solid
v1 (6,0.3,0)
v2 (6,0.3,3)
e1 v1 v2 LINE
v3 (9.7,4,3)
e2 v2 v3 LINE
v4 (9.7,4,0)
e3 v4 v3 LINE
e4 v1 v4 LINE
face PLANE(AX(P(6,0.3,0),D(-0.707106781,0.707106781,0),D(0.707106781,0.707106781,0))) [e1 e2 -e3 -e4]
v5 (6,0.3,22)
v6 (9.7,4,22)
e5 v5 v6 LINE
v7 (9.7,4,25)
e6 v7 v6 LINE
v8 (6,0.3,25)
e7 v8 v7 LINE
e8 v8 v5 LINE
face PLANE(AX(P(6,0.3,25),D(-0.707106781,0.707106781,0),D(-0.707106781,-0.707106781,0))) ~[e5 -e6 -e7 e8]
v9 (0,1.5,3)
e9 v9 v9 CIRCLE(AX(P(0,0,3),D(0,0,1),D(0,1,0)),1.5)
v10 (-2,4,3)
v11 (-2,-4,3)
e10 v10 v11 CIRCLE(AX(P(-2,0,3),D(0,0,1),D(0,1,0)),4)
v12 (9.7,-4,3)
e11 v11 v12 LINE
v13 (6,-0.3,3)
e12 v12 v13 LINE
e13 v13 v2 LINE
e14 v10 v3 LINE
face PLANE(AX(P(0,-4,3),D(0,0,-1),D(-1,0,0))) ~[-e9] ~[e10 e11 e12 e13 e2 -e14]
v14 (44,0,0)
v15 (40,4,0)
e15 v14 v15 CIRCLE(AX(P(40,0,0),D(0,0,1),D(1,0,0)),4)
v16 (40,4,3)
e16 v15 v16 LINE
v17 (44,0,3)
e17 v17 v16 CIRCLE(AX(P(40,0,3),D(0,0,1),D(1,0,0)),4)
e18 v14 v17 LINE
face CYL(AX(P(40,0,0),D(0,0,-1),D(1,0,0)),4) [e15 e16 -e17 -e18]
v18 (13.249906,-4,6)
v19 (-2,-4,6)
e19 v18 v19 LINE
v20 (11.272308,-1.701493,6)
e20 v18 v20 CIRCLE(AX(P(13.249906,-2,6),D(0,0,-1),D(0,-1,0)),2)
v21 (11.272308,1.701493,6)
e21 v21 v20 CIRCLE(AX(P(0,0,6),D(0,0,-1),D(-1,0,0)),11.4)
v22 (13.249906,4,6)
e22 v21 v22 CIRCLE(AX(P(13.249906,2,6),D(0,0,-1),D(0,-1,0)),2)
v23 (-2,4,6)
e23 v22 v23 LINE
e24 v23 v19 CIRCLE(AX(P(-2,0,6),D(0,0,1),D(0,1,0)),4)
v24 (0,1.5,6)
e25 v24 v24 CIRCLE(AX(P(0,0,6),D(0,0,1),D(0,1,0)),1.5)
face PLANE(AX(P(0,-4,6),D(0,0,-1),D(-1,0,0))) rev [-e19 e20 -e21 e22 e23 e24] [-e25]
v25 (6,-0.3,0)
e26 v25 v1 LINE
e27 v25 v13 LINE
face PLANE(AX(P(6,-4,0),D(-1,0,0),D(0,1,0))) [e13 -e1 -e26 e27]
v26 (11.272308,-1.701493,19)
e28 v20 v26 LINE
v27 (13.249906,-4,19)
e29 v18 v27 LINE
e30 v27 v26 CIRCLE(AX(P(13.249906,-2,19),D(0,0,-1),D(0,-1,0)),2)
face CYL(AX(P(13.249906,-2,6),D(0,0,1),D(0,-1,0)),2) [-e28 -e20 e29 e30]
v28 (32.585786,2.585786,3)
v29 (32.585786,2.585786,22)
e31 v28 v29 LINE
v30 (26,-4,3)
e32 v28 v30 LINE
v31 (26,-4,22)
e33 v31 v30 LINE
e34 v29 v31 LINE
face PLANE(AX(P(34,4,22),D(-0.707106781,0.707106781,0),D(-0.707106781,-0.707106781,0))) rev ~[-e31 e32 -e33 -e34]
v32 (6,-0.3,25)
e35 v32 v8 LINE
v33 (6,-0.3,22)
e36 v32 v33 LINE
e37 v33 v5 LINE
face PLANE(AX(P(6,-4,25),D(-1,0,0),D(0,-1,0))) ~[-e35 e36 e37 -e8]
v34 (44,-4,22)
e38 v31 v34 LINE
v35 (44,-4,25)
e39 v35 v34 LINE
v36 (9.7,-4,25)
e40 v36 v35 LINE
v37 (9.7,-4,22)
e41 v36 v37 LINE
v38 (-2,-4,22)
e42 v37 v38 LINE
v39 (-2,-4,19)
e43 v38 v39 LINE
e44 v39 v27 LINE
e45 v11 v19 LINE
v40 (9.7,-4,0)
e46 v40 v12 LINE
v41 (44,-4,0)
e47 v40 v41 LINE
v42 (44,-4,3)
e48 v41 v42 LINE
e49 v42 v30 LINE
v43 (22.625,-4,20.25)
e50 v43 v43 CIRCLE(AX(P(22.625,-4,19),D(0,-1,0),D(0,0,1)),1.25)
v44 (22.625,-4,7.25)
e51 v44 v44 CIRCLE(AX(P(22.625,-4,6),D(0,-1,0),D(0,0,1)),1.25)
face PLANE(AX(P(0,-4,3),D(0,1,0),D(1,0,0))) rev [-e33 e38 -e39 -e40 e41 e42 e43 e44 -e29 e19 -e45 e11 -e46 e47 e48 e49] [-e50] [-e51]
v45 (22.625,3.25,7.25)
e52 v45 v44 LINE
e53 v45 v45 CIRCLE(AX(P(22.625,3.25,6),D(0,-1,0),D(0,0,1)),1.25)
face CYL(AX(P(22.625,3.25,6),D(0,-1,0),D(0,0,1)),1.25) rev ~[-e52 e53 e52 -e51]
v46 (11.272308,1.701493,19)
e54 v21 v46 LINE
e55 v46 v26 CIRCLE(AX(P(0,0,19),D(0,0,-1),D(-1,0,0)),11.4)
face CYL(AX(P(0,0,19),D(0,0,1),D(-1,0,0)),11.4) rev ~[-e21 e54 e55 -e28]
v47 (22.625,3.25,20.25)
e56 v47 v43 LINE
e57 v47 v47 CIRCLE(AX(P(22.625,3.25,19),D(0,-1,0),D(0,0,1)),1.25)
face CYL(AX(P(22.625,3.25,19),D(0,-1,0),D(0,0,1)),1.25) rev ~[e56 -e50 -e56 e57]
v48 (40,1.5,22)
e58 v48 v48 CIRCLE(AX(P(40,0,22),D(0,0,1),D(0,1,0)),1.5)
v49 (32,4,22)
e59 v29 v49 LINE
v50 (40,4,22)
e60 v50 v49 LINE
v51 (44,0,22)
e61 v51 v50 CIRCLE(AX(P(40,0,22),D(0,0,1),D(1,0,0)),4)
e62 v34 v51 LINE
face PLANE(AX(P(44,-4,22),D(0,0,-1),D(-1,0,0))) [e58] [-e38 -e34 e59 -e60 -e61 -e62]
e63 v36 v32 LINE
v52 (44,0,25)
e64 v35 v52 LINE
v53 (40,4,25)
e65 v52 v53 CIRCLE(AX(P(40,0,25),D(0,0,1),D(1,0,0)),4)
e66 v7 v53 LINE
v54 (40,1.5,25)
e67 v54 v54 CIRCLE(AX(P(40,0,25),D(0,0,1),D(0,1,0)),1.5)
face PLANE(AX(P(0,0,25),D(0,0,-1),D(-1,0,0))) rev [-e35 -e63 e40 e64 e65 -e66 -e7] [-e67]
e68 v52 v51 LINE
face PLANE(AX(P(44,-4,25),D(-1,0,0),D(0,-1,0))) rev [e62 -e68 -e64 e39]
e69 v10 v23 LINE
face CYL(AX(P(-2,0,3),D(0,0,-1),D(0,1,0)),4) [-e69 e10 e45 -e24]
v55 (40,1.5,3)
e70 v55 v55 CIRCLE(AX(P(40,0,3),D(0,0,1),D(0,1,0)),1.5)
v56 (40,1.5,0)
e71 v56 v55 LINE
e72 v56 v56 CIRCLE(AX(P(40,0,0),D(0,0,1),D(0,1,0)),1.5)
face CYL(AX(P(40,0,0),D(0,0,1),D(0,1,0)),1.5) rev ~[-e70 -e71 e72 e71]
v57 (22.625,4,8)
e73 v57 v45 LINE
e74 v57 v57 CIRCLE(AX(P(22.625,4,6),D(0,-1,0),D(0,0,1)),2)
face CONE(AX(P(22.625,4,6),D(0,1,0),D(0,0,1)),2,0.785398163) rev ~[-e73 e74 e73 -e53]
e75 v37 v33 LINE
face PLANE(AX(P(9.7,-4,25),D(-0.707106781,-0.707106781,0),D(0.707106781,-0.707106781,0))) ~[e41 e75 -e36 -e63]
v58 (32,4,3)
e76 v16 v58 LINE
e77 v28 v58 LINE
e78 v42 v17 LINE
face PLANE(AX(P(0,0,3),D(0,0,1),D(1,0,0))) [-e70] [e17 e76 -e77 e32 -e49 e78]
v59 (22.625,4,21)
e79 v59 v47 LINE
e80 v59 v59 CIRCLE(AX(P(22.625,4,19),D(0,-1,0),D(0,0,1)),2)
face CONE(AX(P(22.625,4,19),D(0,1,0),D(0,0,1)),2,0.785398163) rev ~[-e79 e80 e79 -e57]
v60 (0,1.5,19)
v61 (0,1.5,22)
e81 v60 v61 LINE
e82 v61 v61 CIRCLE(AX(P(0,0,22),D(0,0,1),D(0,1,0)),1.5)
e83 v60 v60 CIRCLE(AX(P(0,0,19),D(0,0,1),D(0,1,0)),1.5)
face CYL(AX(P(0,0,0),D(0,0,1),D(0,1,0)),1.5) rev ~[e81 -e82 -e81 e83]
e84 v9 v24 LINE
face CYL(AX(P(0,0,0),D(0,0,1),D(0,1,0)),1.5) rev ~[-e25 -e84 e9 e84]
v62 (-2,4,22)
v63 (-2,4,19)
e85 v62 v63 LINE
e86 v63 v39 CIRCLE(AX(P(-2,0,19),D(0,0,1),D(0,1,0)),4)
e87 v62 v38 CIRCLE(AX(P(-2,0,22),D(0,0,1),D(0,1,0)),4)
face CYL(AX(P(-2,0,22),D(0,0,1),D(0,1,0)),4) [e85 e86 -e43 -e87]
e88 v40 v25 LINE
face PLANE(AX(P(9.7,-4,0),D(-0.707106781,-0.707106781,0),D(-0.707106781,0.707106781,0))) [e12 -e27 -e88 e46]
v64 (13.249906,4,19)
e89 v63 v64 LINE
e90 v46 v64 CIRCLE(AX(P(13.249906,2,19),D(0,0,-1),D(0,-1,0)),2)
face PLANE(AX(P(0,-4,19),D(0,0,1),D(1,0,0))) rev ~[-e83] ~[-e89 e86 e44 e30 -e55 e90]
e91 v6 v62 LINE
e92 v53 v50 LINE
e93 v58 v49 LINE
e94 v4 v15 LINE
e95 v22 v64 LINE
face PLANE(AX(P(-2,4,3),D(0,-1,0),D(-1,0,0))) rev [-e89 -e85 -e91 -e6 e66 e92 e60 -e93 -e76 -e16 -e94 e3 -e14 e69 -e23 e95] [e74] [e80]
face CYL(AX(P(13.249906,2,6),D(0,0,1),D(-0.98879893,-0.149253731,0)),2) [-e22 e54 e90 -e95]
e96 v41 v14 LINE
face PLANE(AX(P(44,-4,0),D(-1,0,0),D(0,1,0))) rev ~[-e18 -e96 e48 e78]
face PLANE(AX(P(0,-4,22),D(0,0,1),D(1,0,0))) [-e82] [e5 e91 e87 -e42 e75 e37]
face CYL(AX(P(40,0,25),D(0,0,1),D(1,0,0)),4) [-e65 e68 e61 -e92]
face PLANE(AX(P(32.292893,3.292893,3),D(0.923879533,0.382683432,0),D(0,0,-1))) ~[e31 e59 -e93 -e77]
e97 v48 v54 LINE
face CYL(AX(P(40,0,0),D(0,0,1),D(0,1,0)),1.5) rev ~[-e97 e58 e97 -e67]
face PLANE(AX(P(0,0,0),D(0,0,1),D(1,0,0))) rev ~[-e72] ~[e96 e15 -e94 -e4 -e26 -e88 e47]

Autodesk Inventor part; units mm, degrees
ref_plane "YZ Plane" through (0, 0, 0) normal (1, 0, 0) x (0, 1, 0)
ref_plane "XZ Plane" through (0, 0, 0) normal (0, 1, 0) x (-1, 0, 0)
ref_plane "XY Plane" through (0, 0, 0) normal (0, 0, 1) x (1, 0, 0)
sketch "Skizze1" plane through (0, 0, 0) normal (0, 0, 1) x (1, 0, 0)
  circle A0 centre (0, 0) radius 4 construction
  circle A1 centre (40, 0) radius 4 construction
  line L0 (0, 0) -> (40, 0) construction
  arc A2 (0, 4) -> (0, -4) centre (0, 0) ccw
  arc A3 (44, 0) -> (40, 4) centre (40, 0) ccw
  line L1 (0, 4) -> (40, 4)
  line L2 (0, -4) -> (44, -4)
  line L3 (44, -4) -> (44, 0)
  dimension "d0" = 8
  dimension "d1" = 40
extrude "Extrusion1" add sketch "Skizze1" along normal blind 3
sketch "Skizze2" plane through (0, 0, 3) normal (0, 0, 1) x (1, 0, 0)
  arc A0 (0, 4) -> (0, -4) centre (0, 0) ccw projected
  line L0 (0, -4) -> (44, -4) projected
  line L1 (44, -4) -> (44, 0) projected
  arc A1 (44, 0) -> (40, 4) centre (40, 0) ccw projected
  line L2 (40, 4) -> (0, 4) projected
  line L3 (6, 4) -> (34, 4)
  line L4 (34, 4) -> (34, -4)
  line L5 (34, -4) -> (6, -4)
  line L6 (6, -4) -> (6, 4)
  line L7 (0, 0) -> (-4, 0) construction
  line L8 (-4, 0) -> (-4, -4) construction
  line L9 (-4, -4) -> (0, -4) construction
  line L10 (0, -4) -> (0, 0) construction
  dimension "d4" = 10
  dimension "d5" = 4
  dimension "d6" = 10
extrude "Extrusion2" add sketch "Skizze2" along normal blind 9.5 contours L2 L4 L0 L6
sketch "Skizze3" plane through (0, 0, 0) normal (0, 0, -1) x (-1, 0, 0)
  line L0 (-6, -4) -> (-6, 4) projected
  line L1 (-6, 4) -> (0, 4) projected
  arc A0 (0, -4) -> (0, 4) centre (0, 0) ccw projected
  line L2 (0, -4) -> (-6, -4) projected
sketch "Skizze4" plane through (0, 0, 3) normal (0, 0, 1) x (1, 0, 0)
  line L0 (6, -4) -> (6, 4) projected
  line L1 (6, 4) -> (0, 4) projected
  arc A0 (0, 4) -> (0, -4) centre (0, 0) ccw projected
  line L2 (0, -4) -> (6, -4) projected
extrude "Extrusion3" add sketch "Skizze4" along normal blind 3
extrude "Extrusion4" cut sketch "Skizze3" against normal blind 3
sketch "Skizze5" plane through (0, 0, 0) normal (0, 0, -1) x (-1, 0, 0)
  line L0 (-6, -4) -> (-6, 4) projected
  line L1 (-40, 4) -> (-6, 4) projected
  arc A0 (-40, 4) -> (-44, 0) centre (-40, 0) ccw projected
  line L2 (-6, -4) -> (-44, -4) projected
  line L3 (-6, 0.3) -> (-9.7, 4)
  line L4 (-9.7, -4) -> (-6, -0.3)
  line L5 (-9.7, 4) -> (-6, 4)
  line L6 (-6, 0.3) -> (-6, 4)
  line L7 (0, 0) -> (-40, 0) construction
  circle A1 centre (0, 0) radius 4
  line L8 (-6, -4) -> (-6, 4) projected
  line L9 (0, -4) -> (-6, -4) projected
  arc A2 (0, -4) -> (0, 4) centre (0, 0) ccw projected
  line L10 (-6, 4) -> (0, 4) projected
  line L11 (-3.0018, 2.6437) -> (3.0018, -2.6437)
  line L12 (3.0018, -2.6437) -> (-9.9619, -17.3635)
  line L13 (-9.9619, -17.3635) -> (-15.9655, -12.0761)
  line L14 (-15.9655, -12.0761) -> (-3.0018, 2.6437)
  dimension "d13" = 45
  dimension "d14" = 0.6
extrude "Extrusion5" cut sketch "Skizze5" against normal up to surface (3 mm away) contours L0 L14 L2 L4 | L3 L1 L0 | L0 L2 L14
mirror "Spiegeln1" about plane through (20, 0, 12.5) normal (0, 0, 1)
sketch "Skizze6" plane through (6, -4, 19) normal (0, 0, -1) x (-1, 0, 0)
  line L0 (0, 8) -> (0, 0) projected
  line L1 (6, 0) -> (0, 0) projected
  arc A0 (6, 0) -> (6, 8) centre (6, 4) ccw projected
  line L2 (0, 8) -> (6, 8) projected
  line L3 (-3.7, 0) -> (-38, 0) projected
  line L4 (6, 0) -> (-3.7, 0) projected
  line L5 (0, 3.7) -> (-3.7, 0) projected
  line L6 (0, 3.7) -> (0, 4.3) projected
  line L7 (-3.7, 8) -> (0, 4.3) projected
  line L8 (-3.7, 8) -> (6, 8) projected
  arc A1 (6, 0) -> (6, 8) centre (6, 4) ccw projected
extrude "Extrusion6" cut sketch "Skizze6" along normal up to surface (13 mm away) contours L0 L7 L8 | L0 L4 L5
sketch "Skizze7" plane through (0, 0, 19) normal (0, 0, -1) x (-1, 0, 0)
  arc A0 (0, -4) -> (0, 4) centre (0, 0) ccw projected
  circle A1 centre (0, 0) radius 11.4
  circle A2 centre (0, 0) radius 13 construction
  dimension "d19" = 1.6
  dimension "d47" = 26
extrude "Extrusion7" cut sketch "Skizze7" along normal up to surface (13 mm away)
sketch "Skizze8" plane through (44, -4, 22) normal (0, 0, -1) x (-1, 0, 0)
  line L0 (10, 8) -> (10, 0) projected
  line L1 (10, 0) -> (0, 0) projected
  line L2 (10, 8) -> (18, 0)
  line L3 (18, 0) -> (10, 0)
  point P0 (44, 4)
  dimension "d22" = 45
extrude "Extrusion8" cut sketch "Skizze8" along normal up to surface (19 mm away)
sketch "Skizze9" plane through (0, 0, 0) normal (0, 0, -1) x (-1, 0, 0)
  arc A0 (-40, 4) -> (-44, 0) centre (-40, 0) ccw projected
  point P0 (0, 0)
hole "Bohrung1" at (40, 0, 0) direction (0, 0, 1) diameter 3 end through all
hole "Bohrung2" at (0, 0, 0) direction (0, 0, 1) diameter 3 end through all
fillet "Rundung1" radius 2 2 edges at (10.6752, 4, 12.5) (10.6752, -4, 12.5)
chamfer "Fase1" distance 2 angle 45 1 edges at (34, 4, 12.5)
sketch "Skizze12" plane through (40, 4, 3) normal (0, 1, 0) x (1, 0, 0)
  line L0 (-8, 0) -> (-8, -19) projected
  line L1 (-26.7501, -3) -> (-8, -3)
  line L2 (-26.7501, -16) -> (-8, -16)
  point P0 (-40, 3)
  point P1 (-17.375, -3)
  point P2 (-17.375, -16)
  point P3 (-17.375, -3)
  point P4 (-17.375, -16)
hole "Bohrung3" at (22.625, 4, 6) at (22.625, 4, 19) direction (0, -1, 0) diameter 2.5 end through all countersink diameter 4 countersink angle 90
sketch "Skizze13" plane through (0, -4, 22) normal (0, 0, 1) x (1, 0, 0)
  line L0 (0, 0) -> (9.7, 0) projected
  line L1 (9.7, 8) -> (0, 8) projected
  arc A0 (0, 8) -> (0, 0) centre (0, 4) ccw projected
  arc A1 (-2, 8) -> (-2, 0) centre (-2, 4) ccw
  line L2 (-2, 8) -> (0, 8)
  line L3 (0, 0) -> (-2, 0)
  dimension "d59" = 2
extrude "Extrusion11" add sketch "Skizze13" against normal up to surface (3 mm away)
ref_plane "Arbeitsebene1" through (44, -4, 12.5) normal (0, 0, -1) x (-1, 0, 0)
mirror "Spiegeln2" about plane through (44, -4, 12.5) normal (0, 0, -1) of "Extrusion11"
equation "\"d0\" = Finger_diameter"
equation "\"d1\" = FingerLaenge_A"
equation "\"d2\" = FingerWall"
equation "\"d4\" = 2.5 * d5"
equation "\"d6\" = d4"
equation "\"d7\" = -0.5 * FingerWall + 0.5 * Finger_width"
equation "\"d9\" = FingerWall"
equation "\"d11\" = FingerWall"
equation "\"d15\" = FingerWall"
equation "\"d32\" = bearingHole"
equation "\"FingerLaenge_A\" = 40"
equation "\"FingerLaenge_B\" = 25"
equation "\"Hebel_B\" = 25"
equation "\"Finger_width\" = 22"
equation "\"Finger_diameter\" = 8"
equation "\"FingerWall\" = 3"
equation "\"Hebel_basis_2\" = 15"
equation "\"Join_width\" = 3"
equation "\"bearingHole\" = 3"
equation "\"bearingWall\" = 4"
equation "\"support_D\" = 0.25"
properties part number "FingerPartA"
